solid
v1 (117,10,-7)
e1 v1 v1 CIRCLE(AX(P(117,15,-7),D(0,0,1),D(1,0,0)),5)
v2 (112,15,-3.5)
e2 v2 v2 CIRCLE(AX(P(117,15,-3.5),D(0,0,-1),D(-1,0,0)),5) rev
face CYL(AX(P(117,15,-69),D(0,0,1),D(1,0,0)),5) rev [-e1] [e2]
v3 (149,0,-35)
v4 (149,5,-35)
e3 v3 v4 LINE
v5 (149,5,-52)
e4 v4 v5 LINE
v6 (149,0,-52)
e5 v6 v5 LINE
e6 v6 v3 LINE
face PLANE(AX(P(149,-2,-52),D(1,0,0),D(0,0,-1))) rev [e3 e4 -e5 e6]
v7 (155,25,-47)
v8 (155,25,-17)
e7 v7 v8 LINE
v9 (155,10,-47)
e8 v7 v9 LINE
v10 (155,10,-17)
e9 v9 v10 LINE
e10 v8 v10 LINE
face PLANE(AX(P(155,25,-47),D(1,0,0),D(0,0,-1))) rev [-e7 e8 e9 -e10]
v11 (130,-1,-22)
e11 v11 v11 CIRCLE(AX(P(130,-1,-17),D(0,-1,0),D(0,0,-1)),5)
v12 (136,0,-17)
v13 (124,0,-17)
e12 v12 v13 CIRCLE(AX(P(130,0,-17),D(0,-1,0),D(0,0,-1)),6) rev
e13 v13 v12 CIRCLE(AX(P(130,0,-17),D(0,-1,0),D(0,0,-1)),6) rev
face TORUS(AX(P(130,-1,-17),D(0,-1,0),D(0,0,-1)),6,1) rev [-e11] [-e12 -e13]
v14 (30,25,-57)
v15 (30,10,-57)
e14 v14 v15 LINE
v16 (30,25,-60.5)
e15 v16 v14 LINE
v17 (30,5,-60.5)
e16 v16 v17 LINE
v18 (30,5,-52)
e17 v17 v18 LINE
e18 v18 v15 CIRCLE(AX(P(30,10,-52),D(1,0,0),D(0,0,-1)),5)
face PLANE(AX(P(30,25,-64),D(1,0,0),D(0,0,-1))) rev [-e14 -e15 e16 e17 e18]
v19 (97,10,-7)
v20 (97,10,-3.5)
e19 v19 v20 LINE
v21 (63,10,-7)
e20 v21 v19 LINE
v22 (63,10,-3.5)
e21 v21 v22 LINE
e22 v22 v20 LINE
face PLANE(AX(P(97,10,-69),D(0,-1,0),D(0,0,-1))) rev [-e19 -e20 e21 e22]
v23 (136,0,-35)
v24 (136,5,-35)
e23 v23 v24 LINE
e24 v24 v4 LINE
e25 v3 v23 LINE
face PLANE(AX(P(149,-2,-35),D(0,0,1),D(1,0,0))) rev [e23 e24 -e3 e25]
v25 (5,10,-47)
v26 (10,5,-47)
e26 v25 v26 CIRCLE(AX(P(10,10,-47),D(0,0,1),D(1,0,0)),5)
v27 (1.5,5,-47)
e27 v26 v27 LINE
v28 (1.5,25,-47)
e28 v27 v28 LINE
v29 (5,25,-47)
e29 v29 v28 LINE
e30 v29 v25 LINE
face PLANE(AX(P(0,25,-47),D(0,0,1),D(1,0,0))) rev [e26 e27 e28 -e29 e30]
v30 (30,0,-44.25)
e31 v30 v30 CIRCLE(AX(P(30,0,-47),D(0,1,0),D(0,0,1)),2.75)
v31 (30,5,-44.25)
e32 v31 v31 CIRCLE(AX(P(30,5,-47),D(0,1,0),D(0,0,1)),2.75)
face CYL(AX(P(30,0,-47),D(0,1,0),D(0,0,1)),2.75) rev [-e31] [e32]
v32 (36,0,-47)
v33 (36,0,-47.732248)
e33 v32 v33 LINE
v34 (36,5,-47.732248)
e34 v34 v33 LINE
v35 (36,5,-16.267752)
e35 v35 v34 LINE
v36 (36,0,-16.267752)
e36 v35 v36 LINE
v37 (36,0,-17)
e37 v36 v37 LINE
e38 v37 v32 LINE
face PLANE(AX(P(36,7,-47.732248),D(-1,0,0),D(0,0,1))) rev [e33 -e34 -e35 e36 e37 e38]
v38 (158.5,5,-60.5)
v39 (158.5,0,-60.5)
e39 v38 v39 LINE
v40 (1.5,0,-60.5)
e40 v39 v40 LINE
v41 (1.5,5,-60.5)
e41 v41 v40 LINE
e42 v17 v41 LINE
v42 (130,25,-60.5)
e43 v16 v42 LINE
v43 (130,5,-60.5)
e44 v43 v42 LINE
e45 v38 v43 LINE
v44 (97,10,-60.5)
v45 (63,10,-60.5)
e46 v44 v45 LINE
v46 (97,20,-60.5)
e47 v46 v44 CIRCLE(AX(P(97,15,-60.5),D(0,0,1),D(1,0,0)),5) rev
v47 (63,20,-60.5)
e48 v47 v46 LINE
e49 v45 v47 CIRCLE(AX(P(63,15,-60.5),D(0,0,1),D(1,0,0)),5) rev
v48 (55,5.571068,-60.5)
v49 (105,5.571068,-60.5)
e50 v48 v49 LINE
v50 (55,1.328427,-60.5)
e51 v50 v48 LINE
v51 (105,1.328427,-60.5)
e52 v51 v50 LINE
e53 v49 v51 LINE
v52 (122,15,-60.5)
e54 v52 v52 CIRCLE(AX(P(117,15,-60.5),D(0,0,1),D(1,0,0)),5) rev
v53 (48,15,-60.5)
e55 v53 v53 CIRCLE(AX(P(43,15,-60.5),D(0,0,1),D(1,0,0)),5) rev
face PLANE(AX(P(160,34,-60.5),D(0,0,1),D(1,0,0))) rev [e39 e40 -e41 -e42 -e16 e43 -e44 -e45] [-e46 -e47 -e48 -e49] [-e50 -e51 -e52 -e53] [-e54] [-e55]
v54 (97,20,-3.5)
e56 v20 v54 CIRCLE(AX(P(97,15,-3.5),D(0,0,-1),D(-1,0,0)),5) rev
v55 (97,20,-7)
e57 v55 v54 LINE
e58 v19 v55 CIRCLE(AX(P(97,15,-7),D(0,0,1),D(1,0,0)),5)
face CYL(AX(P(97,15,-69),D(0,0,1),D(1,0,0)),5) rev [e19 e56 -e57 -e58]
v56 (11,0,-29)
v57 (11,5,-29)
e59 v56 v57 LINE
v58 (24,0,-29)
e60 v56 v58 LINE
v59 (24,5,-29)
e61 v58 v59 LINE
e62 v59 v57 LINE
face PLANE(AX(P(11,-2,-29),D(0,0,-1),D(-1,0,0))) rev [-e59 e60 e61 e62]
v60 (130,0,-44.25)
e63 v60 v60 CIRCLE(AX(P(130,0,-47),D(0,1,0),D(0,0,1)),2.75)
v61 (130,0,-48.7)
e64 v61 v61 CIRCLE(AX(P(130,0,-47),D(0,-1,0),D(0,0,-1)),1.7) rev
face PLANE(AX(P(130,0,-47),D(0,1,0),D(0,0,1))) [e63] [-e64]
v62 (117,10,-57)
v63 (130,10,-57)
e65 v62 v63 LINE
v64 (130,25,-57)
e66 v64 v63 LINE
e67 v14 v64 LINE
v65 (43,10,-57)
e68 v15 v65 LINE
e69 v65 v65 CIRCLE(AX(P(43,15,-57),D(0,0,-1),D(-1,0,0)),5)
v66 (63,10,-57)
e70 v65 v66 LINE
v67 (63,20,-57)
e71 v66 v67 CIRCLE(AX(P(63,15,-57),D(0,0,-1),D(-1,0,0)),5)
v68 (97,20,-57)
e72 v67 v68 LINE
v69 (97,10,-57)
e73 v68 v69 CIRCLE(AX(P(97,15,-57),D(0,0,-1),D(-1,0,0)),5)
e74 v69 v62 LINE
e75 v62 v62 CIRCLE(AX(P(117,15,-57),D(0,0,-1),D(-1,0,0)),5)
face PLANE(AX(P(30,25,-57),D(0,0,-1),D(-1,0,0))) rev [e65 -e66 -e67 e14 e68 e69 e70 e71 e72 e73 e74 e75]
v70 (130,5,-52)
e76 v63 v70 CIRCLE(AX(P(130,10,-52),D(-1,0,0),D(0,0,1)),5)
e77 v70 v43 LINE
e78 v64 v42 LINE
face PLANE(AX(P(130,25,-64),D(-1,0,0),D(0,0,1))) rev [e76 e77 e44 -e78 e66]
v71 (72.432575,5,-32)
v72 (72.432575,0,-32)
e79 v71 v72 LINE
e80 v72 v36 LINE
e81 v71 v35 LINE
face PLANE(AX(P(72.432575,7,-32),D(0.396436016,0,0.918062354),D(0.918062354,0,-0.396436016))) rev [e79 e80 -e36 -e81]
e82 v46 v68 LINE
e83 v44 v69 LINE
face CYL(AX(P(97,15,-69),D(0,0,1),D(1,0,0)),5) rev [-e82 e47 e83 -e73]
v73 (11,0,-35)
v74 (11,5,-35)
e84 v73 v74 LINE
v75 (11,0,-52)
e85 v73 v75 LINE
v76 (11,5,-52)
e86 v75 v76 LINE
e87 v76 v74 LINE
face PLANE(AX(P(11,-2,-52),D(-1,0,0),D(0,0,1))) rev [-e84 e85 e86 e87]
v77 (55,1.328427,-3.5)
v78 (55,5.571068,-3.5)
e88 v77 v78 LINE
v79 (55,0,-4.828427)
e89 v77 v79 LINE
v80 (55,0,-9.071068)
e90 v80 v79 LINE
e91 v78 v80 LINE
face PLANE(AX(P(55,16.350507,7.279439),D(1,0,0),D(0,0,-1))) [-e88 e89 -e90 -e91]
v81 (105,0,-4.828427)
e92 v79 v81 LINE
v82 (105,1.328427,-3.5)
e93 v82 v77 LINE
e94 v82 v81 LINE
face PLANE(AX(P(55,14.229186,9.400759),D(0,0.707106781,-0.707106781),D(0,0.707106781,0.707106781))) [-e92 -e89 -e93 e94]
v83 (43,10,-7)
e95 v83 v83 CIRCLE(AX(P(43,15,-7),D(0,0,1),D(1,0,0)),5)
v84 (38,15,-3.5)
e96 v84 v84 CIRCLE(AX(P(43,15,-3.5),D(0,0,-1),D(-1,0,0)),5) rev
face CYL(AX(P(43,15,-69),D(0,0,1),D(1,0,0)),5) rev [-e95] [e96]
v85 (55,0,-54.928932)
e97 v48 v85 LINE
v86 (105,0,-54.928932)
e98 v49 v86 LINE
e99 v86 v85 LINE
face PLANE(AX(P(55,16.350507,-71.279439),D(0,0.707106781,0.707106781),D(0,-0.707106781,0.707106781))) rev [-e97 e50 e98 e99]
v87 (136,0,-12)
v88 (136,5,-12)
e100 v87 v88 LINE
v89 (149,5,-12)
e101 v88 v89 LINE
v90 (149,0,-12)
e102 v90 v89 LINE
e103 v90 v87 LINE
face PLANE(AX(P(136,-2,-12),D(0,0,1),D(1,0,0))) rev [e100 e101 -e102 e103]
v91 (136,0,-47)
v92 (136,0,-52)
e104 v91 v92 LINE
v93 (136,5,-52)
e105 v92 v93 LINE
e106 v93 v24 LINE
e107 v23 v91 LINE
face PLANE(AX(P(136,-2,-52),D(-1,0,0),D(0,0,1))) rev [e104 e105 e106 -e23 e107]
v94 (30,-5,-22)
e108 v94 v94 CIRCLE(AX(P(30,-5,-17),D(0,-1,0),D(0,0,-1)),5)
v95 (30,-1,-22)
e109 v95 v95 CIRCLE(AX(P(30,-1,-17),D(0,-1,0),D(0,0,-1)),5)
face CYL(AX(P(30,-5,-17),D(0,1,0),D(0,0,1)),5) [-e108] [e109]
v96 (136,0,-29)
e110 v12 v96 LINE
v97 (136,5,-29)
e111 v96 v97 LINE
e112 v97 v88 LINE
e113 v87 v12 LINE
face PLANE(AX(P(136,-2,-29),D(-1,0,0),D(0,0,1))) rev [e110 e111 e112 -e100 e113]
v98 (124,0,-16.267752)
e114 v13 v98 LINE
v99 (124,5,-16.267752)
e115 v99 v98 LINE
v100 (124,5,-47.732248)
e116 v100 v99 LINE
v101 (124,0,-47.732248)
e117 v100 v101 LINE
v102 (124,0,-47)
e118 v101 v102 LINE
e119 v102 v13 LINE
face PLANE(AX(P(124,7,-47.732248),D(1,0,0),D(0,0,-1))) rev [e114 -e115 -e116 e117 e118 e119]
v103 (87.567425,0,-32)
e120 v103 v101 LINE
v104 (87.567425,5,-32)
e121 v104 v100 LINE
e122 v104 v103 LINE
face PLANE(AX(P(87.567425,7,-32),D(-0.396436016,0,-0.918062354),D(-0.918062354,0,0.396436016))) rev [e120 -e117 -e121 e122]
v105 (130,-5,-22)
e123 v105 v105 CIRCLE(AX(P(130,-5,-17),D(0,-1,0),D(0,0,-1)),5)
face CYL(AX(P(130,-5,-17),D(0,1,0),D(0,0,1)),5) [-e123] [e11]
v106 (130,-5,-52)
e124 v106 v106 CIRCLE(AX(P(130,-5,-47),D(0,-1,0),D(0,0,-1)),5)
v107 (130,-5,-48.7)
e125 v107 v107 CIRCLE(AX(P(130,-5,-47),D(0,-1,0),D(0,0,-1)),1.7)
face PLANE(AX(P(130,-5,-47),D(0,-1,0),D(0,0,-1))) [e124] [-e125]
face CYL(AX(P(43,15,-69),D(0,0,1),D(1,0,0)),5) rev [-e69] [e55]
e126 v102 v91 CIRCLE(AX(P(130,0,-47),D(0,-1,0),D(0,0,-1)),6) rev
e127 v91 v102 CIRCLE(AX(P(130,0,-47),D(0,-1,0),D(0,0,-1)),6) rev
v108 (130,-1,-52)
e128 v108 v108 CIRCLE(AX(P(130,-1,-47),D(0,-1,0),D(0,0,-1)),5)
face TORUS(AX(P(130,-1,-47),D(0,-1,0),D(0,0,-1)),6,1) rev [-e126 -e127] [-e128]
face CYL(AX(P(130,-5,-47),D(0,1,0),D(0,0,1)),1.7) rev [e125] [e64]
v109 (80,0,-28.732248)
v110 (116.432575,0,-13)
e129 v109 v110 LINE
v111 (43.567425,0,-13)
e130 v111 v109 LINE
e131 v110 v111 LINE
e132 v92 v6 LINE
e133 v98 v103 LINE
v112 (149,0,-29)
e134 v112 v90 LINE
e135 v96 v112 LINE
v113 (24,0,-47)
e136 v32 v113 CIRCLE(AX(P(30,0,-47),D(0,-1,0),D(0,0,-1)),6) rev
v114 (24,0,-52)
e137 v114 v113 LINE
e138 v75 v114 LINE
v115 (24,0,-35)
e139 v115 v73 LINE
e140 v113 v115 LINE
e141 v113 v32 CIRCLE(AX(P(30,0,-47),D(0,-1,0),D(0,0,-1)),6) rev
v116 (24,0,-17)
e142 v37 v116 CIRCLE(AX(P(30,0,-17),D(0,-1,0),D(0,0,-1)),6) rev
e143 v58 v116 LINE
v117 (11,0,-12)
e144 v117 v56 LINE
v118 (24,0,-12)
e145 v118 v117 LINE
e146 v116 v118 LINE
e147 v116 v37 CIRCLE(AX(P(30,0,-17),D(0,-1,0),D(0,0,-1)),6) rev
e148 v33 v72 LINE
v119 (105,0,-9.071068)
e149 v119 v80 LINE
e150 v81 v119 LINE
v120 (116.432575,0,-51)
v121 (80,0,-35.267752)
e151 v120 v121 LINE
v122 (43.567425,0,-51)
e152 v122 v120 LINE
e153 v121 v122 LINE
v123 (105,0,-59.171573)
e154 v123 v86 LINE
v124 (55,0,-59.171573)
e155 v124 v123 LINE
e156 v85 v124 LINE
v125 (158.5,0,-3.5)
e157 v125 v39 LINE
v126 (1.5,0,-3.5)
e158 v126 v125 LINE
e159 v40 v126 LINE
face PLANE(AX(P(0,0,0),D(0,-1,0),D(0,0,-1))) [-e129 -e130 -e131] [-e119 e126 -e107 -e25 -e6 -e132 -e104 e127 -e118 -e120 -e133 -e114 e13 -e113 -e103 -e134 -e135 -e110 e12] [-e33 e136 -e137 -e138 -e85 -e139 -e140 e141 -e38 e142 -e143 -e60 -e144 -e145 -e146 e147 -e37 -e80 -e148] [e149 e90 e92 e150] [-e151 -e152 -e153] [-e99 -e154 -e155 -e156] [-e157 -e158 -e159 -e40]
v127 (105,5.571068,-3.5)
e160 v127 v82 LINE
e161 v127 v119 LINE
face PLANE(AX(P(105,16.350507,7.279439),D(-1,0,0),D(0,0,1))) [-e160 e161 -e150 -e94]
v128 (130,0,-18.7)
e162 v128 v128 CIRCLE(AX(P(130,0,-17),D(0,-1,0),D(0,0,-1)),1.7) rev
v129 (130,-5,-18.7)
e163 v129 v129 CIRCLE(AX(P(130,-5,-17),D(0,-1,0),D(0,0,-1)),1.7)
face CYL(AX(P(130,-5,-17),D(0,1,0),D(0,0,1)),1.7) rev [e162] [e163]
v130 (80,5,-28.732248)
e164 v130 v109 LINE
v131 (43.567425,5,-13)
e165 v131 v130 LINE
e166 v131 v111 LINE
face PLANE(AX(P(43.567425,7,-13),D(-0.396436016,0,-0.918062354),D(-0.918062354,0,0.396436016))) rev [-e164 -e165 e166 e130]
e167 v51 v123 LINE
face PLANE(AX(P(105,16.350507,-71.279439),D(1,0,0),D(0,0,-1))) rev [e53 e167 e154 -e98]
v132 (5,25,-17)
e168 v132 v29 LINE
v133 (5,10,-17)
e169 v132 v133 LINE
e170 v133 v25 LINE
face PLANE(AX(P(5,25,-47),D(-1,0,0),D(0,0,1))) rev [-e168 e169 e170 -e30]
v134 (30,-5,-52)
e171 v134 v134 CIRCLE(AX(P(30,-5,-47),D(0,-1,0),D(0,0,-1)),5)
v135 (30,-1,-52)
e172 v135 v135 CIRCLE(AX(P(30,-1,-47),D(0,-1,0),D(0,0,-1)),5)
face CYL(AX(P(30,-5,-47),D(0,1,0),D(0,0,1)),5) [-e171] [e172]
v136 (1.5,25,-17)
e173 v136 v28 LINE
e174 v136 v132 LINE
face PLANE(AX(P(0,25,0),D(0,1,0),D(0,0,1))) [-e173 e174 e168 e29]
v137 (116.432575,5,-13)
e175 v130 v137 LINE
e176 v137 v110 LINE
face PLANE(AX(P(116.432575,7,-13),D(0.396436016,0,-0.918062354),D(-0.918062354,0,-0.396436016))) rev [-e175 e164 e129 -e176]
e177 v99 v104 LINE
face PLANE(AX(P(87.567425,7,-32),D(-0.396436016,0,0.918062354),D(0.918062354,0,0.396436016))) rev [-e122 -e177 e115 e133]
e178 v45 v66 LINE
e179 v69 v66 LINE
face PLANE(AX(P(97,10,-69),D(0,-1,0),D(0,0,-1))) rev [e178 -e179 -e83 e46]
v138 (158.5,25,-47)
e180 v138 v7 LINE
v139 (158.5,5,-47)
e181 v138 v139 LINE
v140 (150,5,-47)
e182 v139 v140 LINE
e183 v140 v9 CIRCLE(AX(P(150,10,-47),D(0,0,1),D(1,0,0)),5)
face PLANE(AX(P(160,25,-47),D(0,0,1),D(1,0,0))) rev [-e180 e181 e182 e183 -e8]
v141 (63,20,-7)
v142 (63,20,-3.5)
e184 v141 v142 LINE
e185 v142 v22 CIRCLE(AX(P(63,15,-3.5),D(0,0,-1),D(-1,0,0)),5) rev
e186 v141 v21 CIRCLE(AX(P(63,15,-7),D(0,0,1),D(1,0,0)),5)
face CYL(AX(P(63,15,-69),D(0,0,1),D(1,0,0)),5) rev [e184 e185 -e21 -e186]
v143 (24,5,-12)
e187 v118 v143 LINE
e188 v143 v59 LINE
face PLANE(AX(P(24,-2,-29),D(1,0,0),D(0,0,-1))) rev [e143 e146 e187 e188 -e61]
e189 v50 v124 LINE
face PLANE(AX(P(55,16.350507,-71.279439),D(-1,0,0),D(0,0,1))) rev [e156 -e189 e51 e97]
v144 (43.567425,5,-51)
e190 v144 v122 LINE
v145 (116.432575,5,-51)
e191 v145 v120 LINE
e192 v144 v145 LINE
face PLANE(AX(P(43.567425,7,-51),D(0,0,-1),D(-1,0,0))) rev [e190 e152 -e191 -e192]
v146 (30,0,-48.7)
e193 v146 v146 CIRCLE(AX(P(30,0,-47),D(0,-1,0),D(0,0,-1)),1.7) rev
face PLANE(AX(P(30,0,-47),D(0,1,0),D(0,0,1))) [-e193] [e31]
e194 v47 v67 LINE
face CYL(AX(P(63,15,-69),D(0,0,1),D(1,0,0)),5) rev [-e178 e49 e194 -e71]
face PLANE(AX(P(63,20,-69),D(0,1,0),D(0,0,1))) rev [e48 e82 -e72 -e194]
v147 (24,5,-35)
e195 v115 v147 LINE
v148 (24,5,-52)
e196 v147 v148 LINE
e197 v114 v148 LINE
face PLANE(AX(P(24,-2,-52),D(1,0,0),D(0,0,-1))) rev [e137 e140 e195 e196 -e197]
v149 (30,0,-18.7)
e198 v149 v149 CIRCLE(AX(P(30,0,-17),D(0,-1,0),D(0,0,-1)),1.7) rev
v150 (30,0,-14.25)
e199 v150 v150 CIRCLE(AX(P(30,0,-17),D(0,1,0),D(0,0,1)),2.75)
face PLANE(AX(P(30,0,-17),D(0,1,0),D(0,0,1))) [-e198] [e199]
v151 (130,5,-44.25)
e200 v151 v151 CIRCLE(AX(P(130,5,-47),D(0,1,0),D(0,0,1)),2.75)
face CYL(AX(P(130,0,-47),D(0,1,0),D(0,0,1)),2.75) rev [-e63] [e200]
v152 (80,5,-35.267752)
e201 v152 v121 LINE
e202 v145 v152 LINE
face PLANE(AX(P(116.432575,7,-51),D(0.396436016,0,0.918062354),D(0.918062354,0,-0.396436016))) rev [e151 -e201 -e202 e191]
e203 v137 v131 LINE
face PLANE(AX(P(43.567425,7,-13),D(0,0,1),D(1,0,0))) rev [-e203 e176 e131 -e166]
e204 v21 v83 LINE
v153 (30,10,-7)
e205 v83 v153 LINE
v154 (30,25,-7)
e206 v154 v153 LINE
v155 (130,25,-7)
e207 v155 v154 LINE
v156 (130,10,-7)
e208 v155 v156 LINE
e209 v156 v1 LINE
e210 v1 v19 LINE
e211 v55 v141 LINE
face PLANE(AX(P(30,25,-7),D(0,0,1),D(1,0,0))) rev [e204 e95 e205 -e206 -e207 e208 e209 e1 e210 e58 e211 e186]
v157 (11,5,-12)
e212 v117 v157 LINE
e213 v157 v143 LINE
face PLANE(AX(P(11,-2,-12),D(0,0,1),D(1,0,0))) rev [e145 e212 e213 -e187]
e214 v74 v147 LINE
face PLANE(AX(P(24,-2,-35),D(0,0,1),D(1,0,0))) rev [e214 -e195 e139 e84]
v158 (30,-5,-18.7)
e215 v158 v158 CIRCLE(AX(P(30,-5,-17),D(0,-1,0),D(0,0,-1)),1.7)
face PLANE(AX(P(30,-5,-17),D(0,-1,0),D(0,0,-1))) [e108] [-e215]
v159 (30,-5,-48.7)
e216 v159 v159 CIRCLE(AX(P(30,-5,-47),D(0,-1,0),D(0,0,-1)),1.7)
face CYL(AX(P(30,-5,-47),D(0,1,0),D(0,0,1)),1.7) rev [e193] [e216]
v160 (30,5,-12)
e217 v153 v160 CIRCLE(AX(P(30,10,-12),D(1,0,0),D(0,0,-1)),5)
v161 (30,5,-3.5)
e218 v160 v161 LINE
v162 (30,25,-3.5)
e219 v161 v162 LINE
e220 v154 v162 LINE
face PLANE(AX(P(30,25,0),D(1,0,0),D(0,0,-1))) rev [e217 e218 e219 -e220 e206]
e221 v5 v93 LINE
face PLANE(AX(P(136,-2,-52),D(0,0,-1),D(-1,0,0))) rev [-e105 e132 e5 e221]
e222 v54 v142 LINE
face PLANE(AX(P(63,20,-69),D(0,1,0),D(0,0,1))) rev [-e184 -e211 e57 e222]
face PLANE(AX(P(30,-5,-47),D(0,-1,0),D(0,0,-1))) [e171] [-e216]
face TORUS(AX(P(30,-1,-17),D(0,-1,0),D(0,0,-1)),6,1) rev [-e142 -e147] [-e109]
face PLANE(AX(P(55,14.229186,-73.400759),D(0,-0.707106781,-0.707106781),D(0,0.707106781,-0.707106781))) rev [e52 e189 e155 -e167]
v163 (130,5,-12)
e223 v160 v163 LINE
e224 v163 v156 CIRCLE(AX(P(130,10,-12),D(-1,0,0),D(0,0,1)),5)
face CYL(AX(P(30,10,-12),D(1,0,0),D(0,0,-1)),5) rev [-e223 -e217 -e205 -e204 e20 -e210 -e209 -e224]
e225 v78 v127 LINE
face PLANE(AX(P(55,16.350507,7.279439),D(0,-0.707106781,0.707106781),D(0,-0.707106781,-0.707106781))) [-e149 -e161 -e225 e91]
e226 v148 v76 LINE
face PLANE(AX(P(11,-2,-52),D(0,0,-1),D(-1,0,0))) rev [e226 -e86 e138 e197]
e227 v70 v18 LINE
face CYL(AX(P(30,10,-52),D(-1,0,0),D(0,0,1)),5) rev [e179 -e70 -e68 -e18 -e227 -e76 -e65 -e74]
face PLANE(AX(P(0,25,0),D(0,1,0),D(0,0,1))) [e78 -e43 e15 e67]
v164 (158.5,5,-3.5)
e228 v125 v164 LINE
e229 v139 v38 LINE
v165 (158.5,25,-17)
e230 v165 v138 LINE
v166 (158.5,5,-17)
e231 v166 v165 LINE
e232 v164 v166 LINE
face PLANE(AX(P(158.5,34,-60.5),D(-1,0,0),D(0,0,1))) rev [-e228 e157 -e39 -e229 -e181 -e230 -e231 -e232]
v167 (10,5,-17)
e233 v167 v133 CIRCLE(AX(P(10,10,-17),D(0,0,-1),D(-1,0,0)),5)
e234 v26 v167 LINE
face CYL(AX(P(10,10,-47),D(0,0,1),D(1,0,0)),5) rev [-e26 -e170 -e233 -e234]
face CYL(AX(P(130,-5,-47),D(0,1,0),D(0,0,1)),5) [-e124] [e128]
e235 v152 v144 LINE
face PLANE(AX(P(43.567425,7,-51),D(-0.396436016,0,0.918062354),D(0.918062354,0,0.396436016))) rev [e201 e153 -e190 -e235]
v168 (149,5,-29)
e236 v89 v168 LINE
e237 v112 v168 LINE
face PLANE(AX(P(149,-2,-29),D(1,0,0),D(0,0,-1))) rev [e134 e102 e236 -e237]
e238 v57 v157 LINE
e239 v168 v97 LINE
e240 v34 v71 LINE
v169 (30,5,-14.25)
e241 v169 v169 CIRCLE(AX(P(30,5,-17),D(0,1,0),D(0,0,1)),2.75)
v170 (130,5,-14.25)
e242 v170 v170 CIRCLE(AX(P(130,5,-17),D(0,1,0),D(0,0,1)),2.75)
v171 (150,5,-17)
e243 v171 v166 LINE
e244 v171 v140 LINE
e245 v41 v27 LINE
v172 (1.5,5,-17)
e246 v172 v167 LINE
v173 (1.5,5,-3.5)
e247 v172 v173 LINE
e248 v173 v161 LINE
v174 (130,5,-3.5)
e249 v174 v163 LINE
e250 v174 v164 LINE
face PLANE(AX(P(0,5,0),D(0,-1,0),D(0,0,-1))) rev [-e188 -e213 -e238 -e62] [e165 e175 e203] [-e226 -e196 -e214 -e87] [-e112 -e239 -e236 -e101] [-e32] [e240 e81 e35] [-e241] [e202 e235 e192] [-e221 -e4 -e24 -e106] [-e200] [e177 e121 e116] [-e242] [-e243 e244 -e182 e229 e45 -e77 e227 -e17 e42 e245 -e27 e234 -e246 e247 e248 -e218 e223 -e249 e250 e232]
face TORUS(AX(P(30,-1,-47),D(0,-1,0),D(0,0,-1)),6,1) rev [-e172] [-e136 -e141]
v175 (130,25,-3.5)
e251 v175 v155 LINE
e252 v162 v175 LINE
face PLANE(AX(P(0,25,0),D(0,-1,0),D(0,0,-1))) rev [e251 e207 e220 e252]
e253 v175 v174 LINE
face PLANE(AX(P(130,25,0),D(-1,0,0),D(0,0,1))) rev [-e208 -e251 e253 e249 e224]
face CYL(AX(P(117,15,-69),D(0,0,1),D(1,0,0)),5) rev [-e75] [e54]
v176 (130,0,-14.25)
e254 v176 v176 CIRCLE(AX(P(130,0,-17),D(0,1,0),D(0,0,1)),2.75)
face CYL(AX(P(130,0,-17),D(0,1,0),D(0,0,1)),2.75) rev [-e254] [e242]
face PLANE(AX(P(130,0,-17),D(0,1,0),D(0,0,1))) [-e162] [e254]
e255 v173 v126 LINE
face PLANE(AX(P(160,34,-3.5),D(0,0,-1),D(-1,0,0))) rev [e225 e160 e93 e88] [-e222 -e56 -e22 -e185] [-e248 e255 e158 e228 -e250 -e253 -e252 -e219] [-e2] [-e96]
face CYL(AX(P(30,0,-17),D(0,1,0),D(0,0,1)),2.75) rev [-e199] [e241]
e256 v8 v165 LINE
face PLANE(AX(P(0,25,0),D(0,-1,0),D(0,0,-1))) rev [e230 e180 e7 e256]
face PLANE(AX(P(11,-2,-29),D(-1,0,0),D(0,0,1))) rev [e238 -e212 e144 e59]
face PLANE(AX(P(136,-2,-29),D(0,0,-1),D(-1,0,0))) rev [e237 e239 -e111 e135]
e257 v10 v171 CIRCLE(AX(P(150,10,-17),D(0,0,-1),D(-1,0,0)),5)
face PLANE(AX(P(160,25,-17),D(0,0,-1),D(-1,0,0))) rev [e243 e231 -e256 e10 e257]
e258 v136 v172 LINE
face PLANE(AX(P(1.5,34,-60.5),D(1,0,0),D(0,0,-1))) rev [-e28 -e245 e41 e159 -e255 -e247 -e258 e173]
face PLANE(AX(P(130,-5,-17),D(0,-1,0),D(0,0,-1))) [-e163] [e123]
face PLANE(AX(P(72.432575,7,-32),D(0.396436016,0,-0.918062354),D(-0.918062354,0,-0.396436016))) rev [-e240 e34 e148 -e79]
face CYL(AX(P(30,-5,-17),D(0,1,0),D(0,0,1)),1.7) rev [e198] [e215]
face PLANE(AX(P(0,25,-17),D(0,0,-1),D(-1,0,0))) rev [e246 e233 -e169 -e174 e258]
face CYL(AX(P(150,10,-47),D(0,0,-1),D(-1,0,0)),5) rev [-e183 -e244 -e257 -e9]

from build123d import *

# Parameters (mm, degrees)
SKETCH_1_W           = 160
SKETCH_1_H           = 64
EXTRUDE_1_DEPTH      = 5
SKETCH_2_W           = 100
SKETCH_2_H           = 7
SKETCH_2_W_2         = 5
SKETCH_2_H_2         = 30
EXTRUDE_2_DEPTH      = 20
FILLET_1_R           = 5
SKETCH_3_R           = 5
SKETCH_3_R_2         = 1.7
EXTRUDE_3_DEPTH      = 5
SKETCH_4_R           = 2.75
CUT_EXTRUDE_1_DEPTH  = 5
SKETCH_5_W           = 160
SKETCH_5_H           = 2
CUT_EXTRUDE_2_DEPTH  = 64
CUT_EXTRUDE_3_DEPTH  = 7
SKETCH_7_W           = 13
SKETCH_7_H           = 17
CUT_EXTRUDE_4_DEPTH  = 7
SKETCH_8_R           = 5
CUT_EXTRUDE_5_DEPTH  = 67
CUT_EXTRUDE_6_DEPTH  = 1
CUT_EXTRUDE_START    = -9
SKETCH_10_W          = 50
SKETCH_10_H          = 3
CUT_EXTRUDE_7_DEPTH  = 24
SKETCH_12_W          = 160
SKETCH_12_H          = 1.5
CUT_EXTRUDE_11_DEPTH = 34
SKETCH_13_W          = 1.5
SKETCH_13_H          = 57
CUT_EXTRUDE_12_DEPTH = 34
FILLET_2_R           = 1


with BuildPart() as part:
    # 草图1 → 凸台-拉伸1 (new body)
    with BuildSketch(Plane(origin=(0, 0, 0), x_dir=(1, 0, 0), z_dir=(0, 1, 0))):
        with Locations((80, 32)):
            Rectangle(SKETCH_1_W, SKETCH_1_H)
    extrude(amount=EXTRUDE_1_DEPTH)

    # 草图2 → 凸台-拉伸2 (add)
    with BuildSketch(Plane(origin=(0, 5, 0), x_dir=(1, 0, 0), z_dir=(0, 1, 0))):
        with Locations((80, 60.5)):
            Rectangle(SKETCH_2_W, SKETCH_2_H)
        with Locations((157.5, 32)):
            Rectangle(SKETCH_2_W_2, SKETCH_2_H_2)
        with Locations((2.5, 32)):
            Rectangle(SKETCH_2_W_2, SKETCH_2_H_2)
        with Locations((80, 3.5)):
            Rectangle(SKETCH_2_W, SKETCH_2_H)
    extrude(amount=EXTRUDE_2_DEPTH)

    # 圆角1
    fillet_1_edges = [part.edges().sort_by_distance(p)[0] for p in [
        (80, 5, -57),
        (155, 5, -32),
        (5, 5, -32),
        (80, 5, -7),
    ]]
    fillet(fillet_1_edges, radius=FILLET_1_R)

    # 草图3 → 凸台-拉伸3 (add)
    # profile 1 of 4: a face of its own
    with BuildSketch(Plane.XZ):
        with Locations(Location((130, -17, 0), (0, 0, 270))):
            Circle(SKETCH_3_R)
        with Locations(Location((130, -17, 0), (0, 0, 270))):
            Circle(SKETCH_3_R_2, mode=Mode.SUBTRACT)
    # profile 2 of 4: a face of its own
    with BuildSketch(Plane.XZ):
        with Locations(Location((130, -47, 0), (0, 0, 270))):
            Circle(SKETCH_3_R)
        with Locations(Location((130, -47, 0), (0, 0, 270))):
            Circle(SKETCH_3_R_2, mode=Mode.SUBTRACT)
    # profile 3 of 4: a face of its own
    with BuildSketch(Plane.XZ):
        with Locations(Location((30, -47, 0), (0, 0, 270))):
            Circle(SKETCH_3_R)
        with Locations(Location((30, -47, 0), (0, 0, 270))):
            Circle(SKETCH_3_R_2, mode=Mode.SUBTRACT)
    # profile 4 of 4: a face of its own
    with BuildSketch(Plane.XZ):
        with Locations(Location((30, -17, 0), (0, 0, 270))):
            Circle(SKETCH_3_R)
        with Locations(Location((30, -17, 0), (0, 0, 270))):
            Circle(SKETCH_3_R_2, mode=Mode.SUBTRACT)
    extrude(amount=EXTRUDE_3_DEPTH)

    # 草图4 → 切除-拉伸1 (cut)
    with BuildSketch(Plane(origin=(0, 5, 0), x_dir=(1, 0, 0), z_dir=(0, 1, 0))):
        with Locations(Location((130, 17, 0), (0, 0, 270))):
            Circle(SKETCH_4_R)
        with Locations(Location((130, 47, 0), (0, 0, 270))):
            Circle(SKETCH_4_R)
        with Locations(Location((30, 17, 0), (0, 0, 270))):
            Circle(SKETCH_4_R)
        with Locations(Location((30, 47, 0), (0, 0, 270))):
            Circle(SKETCH_4_R)
    extrude(amount=-CUT_EXTRUDE_1_DEPTH, mode=Mode.SUBTRACT)

    # 草图5 → 切除-拉伸2 (cut)
    with BuildSketch(Plane(origin=(0, 25, 0), x_dir=(1, 0, 0), z_dir=(0, 1, 0))):
        with Locations((80, 63)):
            Rectangle(SKETCH_5_W, SKETCH_5_H)
        with Locations((80, 1)):
            Rectangle(SKETCH_5_W, SKETCH_5_H)
    extrude(amount=-CUT_EXTRUDE_2_DEPTH, mode=Mode.SUBTRACT)

    # 草图6 → 切除-拉伸3 (cut)
    with BuildSketch(Plane.XZ):
        Polygon((43.567425452, -51), (116.432574548, -51), (80, -35.2677519), align=None)
        Polygon((36, -47.7322481), (36, -16.2677519), (72.432574548, -32), align=None)
        Polygon((43.567425452, -13), (116.432574548, -13), (80, -28.7322481), align=None)
        Polygon((124, -47.7322481), (124, -16.2677519), (87.567425452, -32), align=None)
    extrude(amount=-CUT_EXTRUDE_3_DEPTH, mode=Mode.SUBTRACT)

    # 草图7 → 切除-拉伸4 (cut)
    with BuildSketch(Plane(origin=(0, 5, 0), x_dir=(1, 0, 0), z_dir=(0, 1, 0))):
        with Locations((17.5, 43.5)):
            Rectangle(SKETCH_7_W, SKETCH_7_H)
        with Locations((17.5, 20.5)):
            Rectangle(SKETCH_7_W, SKETCH_7_H)
        with Locations((142.5, 43.5)):
            Rectangle(SKETCH_7_W, SKETCH_7_H)
        with Locations((142.5, 20.5)):
            Rectangle(SKETCH_7_W, SKETCH_7_H)
    extrude(amount=-CUT_EXTRUDE_4_DEPTH, mode=Mode.SUBTRACT)

    # 草图8 → 切除-拉伸5 (cut)
    with BuildSketch(Plane.XY.offset(-2)):
        with Locations((43, 15)):
            Circle(SKETCH_8_R)
        with Locations((117, 15)):
            Circle(SKETCH_8_R)
        with BuildLine():
            Line((63, 20), (97, 20))
            ThreePointArc((97, 20), (102, 15), (97, 10))
            Line((97, 10), (63, 10))
            ThreePointArc((63, 10), (58, 15), (63, 20))
        make_face()
    extrude(amount=-CUT_EXTRUDE_5_DEPTH, mode=Mode.SUBTRACT)

    # 草图9 → 切除-拉伸6 (cut)
    with BuildSketch(Plane(origin=(160, 0, 0), x_dir=(0, 0, -1), z_dir=(1, 0, 0))):
        Polygon((2, 4.416741909), (2.583258091, 5), (2, 5), align=None)
    extrude(amount=-CUT_EXTRUDE_6_DEPTH, mode=Mode.SUBTRACT)

    # 草图10 → 切除-拉伸7 (cut)
    with BuildSketch(Plane(origin=(0, 1.208370955, 1.208370955), x_dir=(1, 0, 0), z_dir=(0, 0.7071067811865486, 0.7071067811865465)).offset(CUT_EXTRUDE_START)):
        with Locations((80, 4.914213562)):
            Rectangle(SKETCH_10_W, SKETCH_10_H)
    cut_extrude_7 = extrude(amount=CUT_EXTRUDE_7_DEPTH, mode=Mode.SUBTRACT)

    # 镜向1: 切除-拉伸7 across plane
    add(cut_extrude_7.mirror(Plane.XY.offset(-32)), mode=Mode.SUBTRACT)

    # 草图12 → 切除-拉伸11 (cut)
    with BuildSketch(Plane.XZ):
        with Locations((80, -2.75)):
            Rectangle(SKETCH_12_W, SKETCH_12_H)
        with Locations((80, -61.25)):
            Rectangle(SKETCH_12_W, SKETCH_12_H)
    extrude(amount=-CUT_EXTRUDE_11_DEPTH, mode=Mode.SUBTRACT)

    # 草图13 → 切除-拉伸12 (cut)
    with BuildSketch(Plane.XZ):
        with Locations((159.25, -32)):
            Rectangle(SKETCH_13_W, SKETCH_13_H)
        with Locations((0.75, -32)):
            Rectangle(SKETCH_13_W, SKETCH_13_H)
    extrude(amount=-CUT_EXTRUDE_12_DEPTH, mode=Mode.SUBTRACT)

    # 圆角2
    fillet_2_edges = [part.edges().sort_by_distance(p)[0] for p in [
        (130, 0, -12),
        (130, 0, -42),
        (30, 0, -42),
        (30, 0, -12),
    ]]
    fillet(fillet_2_edges, radius=FILLET_2_R - 0.0001)  # a hair under: the kernel refuses the full size


solid = part.part
